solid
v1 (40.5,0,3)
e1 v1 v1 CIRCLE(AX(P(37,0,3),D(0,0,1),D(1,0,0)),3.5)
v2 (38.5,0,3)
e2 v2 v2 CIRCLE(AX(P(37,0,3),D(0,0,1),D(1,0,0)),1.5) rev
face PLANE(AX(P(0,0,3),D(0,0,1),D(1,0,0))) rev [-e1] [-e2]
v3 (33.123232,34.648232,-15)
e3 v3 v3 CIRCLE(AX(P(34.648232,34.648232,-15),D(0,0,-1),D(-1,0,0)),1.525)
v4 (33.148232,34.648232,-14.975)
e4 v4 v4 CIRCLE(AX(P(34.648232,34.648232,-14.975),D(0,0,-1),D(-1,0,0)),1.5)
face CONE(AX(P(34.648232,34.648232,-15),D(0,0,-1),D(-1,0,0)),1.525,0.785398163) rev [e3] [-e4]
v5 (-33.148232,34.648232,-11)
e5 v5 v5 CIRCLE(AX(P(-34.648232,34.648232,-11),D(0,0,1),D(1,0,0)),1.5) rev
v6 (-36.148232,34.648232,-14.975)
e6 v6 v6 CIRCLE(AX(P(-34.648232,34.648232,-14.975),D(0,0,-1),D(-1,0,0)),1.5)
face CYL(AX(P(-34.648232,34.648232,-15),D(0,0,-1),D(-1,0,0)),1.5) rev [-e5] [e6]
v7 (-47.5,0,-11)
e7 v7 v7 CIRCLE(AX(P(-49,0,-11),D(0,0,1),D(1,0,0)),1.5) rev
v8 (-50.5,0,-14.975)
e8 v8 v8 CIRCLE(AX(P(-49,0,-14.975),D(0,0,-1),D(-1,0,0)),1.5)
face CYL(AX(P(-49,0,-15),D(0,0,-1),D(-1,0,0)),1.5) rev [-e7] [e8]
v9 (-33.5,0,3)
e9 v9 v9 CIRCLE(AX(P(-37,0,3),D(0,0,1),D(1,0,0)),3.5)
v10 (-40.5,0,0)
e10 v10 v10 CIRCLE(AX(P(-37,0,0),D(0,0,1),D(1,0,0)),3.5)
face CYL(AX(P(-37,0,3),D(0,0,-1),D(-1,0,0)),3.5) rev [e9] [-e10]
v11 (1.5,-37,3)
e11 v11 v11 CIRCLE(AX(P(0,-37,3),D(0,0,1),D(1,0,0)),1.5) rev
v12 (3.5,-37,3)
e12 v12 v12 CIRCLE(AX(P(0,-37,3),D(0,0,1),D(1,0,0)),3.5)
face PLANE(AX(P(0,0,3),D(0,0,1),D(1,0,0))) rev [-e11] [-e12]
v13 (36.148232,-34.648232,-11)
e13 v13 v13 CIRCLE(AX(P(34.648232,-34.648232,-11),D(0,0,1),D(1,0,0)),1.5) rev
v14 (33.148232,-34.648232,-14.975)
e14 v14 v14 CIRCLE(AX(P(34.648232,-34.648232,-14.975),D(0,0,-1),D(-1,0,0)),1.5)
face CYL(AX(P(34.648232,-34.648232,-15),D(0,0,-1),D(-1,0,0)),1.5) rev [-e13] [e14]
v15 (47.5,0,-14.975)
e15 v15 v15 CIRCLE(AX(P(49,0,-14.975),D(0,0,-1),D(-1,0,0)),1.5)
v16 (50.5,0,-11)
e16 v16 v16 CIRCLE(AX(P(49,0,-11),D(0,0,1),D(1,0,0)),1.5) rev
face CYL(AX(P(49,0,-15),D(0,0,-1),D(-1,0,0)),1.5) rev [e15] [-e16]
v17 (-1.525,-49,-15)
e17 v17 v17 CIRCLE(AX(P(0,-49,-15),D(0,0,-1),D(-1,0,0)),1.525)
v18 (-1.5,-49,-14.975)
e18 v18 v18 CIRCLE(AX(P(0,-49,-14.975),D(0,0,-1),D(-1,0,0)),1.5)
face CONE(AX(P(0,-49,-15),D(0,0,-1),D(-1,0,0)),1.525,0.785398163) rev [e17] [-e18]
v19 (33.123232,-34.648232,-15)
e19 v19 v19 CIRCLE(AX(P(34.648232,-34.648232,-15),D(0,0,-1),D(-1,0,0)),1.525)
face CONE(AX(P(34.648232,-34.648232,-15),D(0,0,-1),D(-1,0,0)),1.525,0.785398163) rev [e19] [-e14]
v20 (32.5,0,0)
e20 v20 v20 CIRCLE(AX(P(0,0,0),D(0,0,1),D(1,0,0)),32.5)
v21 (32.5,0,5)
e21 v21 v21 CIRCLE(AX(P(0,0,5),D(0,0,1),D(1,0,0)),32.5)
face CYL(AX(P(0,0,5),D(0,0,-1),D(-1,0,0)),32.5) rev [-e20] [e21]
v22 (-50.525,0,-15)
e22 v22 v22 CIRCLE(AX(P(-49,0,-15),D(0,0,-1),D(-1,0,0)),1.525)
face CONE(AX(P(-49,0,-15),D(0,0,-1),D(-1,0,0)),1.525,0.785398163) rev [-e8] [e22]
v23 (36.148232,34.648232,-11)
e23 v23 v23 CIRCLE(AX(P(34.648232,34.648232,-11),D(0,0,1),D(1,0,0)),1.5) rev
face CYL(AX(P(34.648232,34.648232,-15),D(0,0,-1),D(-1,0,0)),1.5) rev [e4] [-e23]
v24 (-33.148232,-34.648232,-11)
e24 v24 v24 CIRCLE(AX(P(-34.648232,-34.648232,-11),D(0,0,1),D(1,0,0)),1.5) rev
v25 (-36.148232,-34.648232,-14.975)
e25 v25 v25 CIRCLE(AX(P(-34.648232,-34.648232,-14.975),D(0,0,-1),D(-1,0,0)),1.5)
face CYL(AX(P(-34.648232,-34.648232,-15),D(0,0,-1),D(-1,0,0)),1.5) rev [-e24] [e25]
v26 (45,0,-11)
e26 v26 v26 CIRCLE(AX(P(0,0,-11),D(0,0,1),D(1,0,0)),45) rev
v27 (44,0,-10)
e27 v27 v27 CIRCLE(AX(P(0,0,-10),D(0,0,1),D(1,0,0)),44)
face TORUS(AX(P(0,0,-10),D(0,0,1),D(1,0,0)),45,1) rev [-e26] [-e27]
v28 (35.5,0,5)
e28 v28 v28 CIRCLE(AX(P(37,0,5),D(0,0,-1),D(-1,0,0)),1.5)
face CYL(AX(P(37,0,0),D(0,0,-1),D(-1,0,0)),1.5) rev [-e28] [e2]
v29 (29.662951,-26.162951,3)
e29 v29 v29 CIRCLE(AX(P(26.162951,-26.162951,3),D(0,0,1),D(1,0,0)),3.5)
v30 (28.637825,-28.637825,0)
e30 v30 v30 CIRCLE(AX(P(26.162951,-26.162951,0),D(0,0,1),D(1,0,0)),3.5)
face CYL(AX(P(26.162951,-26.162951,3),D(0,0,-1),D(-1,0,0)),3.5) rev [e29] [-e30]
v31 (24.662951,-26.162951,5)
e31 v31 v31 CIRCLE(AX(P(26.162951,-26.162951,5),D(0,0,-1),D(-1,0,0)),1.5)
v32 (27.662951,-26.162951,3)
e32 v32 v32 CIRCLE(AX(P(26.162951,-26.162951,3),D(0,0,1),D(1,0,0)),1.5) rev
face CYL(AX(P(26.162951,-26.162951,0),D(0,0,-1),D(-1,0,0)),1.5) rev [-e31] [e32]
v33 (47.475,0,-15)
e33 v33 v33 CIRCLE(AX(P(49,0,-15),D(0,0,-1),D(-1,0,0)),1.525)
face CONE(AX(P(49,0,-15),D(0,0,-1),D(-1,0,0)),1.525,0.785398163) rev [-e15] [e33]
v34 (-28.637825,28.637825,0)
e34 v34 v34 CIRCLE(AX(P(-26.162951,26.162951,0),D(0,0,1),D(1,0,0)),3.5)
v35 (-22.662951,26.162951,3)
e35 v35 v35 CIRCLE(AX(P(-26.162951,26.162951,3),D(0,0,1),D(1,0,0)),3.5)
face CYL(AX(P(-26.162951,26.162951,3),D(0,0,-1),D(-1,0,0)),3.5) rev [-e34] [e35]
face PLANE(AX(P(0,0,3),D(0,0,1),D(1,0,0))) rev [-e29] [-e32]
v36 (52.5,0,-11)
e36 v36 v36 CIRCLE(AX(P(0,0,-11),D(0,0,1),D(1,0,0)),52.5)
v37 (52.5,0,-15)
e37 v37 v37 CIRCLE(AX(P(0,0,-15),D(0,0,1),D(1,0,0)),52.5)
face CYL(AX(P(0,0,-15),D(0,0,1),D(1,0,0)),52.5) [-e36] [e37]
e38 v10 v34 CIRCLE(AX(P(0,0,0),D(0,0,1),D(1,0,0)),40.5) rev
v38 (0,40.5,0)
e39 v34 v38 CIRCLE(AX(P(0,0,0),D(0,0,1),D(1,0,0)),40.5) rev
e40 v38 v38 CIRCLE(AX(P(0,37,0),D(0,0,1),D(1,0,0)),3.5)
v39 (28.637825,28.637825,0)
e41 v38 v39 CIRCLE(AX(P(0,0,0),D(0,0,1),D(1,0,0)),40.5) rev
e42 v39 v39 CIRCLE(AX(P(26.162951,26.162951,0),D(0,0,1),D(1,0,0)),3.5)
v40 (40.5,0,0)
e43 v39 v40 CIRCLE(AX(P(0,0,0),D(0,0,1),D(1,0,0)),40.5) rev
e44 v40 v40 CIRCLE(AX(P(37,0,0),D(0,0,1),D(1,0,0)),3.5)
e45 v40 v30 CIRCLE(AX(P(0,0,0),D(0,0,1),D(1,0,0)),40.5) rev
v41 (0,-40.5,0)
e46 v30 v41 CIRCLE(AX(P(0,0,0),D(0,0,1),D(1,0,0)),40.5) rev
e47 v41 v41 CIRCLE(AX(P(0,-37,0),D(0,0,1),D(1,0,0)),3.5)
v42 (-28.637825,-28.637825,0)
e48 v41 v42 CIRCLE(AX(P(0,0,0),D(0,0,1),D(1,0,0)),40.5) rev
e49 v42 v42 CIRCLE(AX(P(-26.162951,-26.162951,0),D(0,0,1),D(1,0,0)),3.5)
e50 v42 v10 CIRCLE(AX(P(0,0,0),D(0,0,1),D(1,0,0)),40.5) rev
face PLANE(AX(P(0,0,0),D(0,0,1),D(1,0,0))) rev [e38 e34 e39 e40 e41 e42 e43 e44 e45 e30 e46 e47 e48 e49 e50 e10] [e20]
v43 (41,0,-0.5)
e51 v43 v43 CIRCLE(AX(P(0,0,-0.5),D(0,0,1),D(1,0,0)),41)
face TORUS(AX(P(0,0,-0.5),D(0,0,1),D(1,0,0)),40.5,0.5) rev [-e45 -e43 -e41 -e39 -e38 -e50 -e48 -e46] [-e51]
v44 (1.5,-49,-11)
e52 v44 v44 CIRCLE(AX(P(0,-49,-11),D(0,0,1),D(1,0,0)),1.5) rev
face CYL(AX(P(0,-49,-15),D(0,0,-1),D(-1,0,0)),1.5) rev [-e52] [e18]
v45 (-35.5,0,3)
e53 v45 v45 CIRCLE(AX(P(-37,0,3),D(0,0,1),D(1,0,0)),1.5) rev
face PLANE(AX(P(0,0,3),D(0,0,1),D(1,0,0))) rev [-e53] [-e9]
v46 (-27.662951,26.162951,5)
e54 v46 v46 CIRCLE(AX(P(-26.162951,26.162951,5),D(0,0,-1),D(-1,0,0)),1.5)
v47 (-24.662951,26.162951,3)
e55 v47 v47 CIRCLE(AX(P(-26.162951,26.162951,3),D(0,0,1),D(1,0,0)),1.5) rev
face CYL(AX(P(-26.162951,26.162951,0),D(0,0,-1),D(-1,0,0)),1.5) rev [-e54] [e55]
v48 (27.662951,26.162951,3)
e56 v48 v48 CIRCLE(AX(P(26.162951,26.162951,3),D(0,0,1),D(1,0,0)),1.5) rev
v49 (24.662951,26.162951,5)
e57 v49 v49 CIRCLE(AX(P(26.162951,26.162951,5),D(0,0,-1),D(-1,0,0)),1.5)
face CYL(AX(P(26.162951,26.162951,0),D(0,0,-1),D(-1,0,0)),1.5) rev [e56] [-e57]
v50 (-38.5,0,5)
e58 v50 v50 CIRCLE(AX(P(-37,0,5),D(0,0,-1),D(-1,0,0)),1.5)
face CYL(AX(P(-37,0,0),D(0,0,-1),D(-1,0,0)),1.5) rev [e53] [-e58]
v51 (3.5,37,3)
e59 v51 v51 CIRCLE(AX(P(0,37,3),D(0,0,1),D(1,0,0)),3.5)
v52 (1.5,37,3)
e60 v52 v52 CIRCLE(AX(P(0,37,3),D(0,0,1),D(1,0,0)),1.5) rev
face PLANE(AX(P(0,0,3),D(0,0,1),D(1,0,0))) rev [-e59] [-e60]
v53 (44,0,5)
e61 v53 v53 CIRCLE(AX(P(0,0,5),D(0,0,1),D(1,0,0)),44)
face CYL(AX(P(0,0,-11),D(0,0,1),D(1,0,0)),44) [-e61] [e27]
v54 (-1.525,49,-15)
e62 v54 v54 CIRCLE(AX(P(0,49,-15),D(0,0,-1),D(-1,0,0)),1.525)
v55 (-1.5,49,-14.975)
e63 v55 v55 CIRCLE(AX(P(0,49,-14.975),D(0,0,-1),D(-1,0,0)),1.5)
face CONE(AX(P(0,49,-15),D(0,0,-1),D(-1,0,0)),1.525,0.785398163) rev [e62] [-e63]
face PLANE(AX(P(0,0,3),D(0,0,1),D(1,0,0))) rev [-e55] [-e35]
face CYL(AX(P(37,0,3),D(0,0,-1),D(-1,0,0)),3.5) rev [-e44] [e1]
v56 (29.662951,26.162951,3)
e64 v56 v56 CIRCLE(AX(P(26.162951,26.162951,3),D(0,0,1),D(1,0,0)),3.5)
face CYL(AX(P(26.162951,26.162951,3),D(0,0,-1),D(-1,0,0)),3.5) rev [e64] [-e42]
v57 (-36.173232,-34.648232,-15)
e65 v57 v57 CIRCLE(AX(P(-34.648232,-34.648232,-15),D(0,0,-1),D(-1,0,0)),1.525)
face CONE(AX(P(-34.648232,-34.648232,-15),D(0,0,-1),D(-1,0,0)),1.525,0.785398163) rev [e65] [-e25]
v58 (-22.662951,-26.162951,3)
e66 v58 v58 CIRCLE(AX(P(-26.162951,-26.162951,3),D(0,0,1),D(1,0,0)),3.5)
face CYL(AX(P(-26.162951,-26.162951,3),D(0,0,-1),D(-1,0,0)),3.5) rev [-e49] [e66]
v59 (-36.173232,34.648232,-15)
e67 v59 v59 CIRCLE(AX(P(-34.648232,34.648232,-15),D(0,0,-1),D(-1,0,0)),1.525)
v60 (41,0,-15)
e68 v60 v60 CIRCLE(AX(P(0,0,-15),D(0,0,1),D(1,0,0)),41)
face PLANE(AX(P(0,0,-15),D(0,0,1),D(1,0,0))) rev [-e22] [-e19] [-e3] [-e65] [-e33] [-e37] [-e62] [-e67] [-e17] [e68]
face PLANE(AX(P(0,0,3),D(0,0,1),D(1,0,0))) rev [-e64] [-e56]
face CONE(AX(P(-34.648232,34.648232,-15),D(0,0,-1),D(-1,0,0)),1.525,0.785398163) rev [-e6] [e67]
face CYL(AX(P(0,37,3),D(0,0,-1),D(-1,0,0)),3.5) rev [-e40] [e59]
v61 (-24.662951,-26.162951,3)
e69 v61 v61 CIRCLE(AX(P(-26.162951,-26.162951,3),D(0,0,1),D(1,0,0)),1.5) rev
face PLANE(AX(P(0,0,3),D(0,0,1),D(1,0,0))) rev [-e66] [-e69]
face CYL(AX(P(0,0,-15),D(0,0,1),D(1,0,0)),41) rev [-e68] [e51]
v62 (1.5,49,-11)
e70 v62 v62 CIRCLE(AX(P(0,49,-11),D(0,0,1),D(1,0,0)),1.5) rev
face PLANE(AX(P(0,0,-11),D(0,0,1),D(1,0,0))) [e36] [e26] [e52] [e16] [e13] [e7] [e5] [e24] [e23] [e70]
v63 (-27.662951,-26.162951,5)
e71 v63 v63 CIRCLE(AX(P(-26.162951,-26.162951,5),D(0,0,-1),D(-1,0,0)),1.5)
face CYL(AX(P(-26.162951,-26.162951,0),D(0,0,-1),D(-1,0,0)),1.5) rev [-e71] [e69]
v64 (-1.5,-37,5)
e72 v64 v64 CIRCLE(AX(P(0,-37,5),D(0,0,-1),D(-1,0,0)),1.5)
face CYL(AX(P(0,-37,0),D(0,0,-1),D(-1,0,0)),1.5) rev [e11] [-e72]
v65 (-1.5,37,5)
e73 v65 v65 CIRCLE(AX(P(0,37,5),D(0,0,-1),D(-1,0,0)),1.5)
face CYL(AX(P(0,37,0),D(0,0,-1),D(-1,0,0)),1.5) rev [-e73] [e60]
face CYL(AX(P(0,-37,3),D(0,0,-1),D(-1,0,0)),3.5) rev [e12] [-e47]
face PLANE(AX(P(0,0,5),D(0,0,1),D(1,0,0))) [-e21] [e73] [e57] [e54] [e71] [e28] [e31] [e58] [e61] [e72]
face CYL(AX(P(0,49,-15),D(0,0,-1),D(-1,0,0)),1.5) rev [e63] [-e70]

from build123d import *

# Parameters (mm, degrees)
SKETCH1_R                       = 41
SKETCH1_R_2                     = 32.5
BOSS_EXTRUDE1_DEPTH             = 5
BOSS_EXTRUDE2_DEPTH             = 5
BOSS_EXTRUDE2_DEPTH_BACK        = 15
SKETCH1_4_R                     = 52.5
SKETCH1_4_R_2                   = 41
F_3_0MM_DOWEL_HOLE1_D           = 3
F_3_0MM_DOWEL_HOLE1_CSINK_D     = 3.05
F_3_0MM_DOWEL_HOLE1_CSINK_ANGLE = 90
SKETCH7_R                       = 3.5
CUT_EXTRUDE1_DEPTH              = 3
F_3_0MM_DOWEL_HOLE2_D           = 3
F_3_0MM_DOWEL_HOLE2_CSINK_D     = 3.05
F_3_0MM_DOWEL_HOLE2_CSINK_ANGLE = 90
SKETCH13_R                      = 52.5
SKETCH13_R_2                    = 1.5
SKETCH13_R_3                    = 44
CUT_EXTRUDE2_DEPTH              = 16
FILLET1_R                       = 0.5
FILLET2_R                       = 1


with BuildPart() as part:
    # Sketch1 → Boss-Extrude1 (new body)
    with BuildSketch(Plane.XY):
        Circle(SKETCH1_R)
        Circle(SKETCH1_R_2, mode=Mode.SUBTRACT)
    extrude(amount=BOSS_EXTRUDE1_DEPTH)

    # Sketch1<4> → Boss-Extrude2 (add, two sides: drawn at the far end of the back side and taken through both)
    with BuildSketch(Plane.XY.offset(-BOSS_EXTRUDE2_DEPTH_BACK)):
        Circle(SKETCH1_4_R)
        Circle(SKETCH1_4_R_2, mode=Mode.SUBTRACT)
    extrude(amount=BOSS_EXTRUDE2_DEPTH + BOSS_EXTRUDE2_DEPTH_BACK)

    # Ø3.0mm Dowel Hole1 (through all)
    with Locations(Plane(origin=(0, 0, 0), x_dir=(-1, 0, 0), z_dir=(0, 0, -1))):
        with Locations((-26.162950904, 26.162950904), (0, 37), (26.162950904, 26.162950904), (37, 0), (-37, 0), (0, -37), (26.162950904, -26.162950904), (-26.162950904, -26.162950904)):
            CounterSinkHole(F_3_0MM_DOWEL_HOLE1_D / 2, F_3_0MM_DOWEL_HOLE1_CSINK_D / 2, counter_sink_angle=F_3_0MM_DOWEL_HOLE1_CSINK_ANGLE)

    # Sketch7 → Cut-Extrude1 (cut)
    with BuildSketch(Plane.XY):
        with Locations((0, 37)):
            Circle(SKETCH7_R)
        with Locations((26.162950904, 26.162950904)):
            Circle(SKETCH7_R)
        with Locations((37, 0)):
            Circle(SKETCH7_R)
        with Locations((26.162950904, -26.162950904)):
            Circle(SKETCH7_R)
        with Locations((0, -37)):
            Circle(SKETCH7_R)
        with Locations((-26.162950904, -26.162950904)):
            Circle(SKETCH7_R)
        with Locations((-37, 0)):
            Circle(SKETCH7_R)
        with Locations((-26.162950904, 26.162950904)):
            Circle(SKETCH7_R)
    extrude(amount=CUT_EXTRUDE1_DEPTH, mode=Mode.SUBTRACT)

    # Ø3.0mm Dowel Hole2 (through all)
    with Locations(Plane(origin=(0, 0, -15), x_dir=(-1, 0, 0), z_dir=(0, 0, -1))):
        with Locations((0, 49), (34.648232278, 34.648232278), (-34.648232278, 34.648232278), (-49, 0), (-34.648232278, -34.648232278), (49, 0), (34.648232278, -34.648232278), (0, -49)):
            CounterSinkHole(F_3_0MM_DOWEL_HOLE2_D / 2, F_3_0MM_DOWEL_HOLE2_CSINK_D / 2, counter_sink_angle=F_3_0MM_DOWEL_HOLE2_CSINK_ANGLE)

    # Sketch13 → Cut-Extrude2 (cut)
    with BuildSketch(Plane.XY.offset(5)):
        Circle(SKETCH13_R)
        with Locations(Location((-34.648232278, -34.648232278, 0), (0, 0, 180.000000005))):
            Circle(SKETCH13_R_2, mode=Mode.SUBTRACT)
        with Locations(Location((0, -49, 0), (0, 0, 180))):
            Circle(SKETCH13_R_2, mode=Mode.SUBTRACT)
        with Locations(Location((34.648232278, -34.648232278, 0), (0, 0, 180.000000005))):
            Circle(SKETCH13_R_2, mode=Mode.SUBTRACT)
        with Locations(Location((-49, 0, 0), (0, 0, 180))):
            Circle(SKETCH13_R_2, mode=Mode.SUBTRACT)
        with Locations(Location((-34.648232278, 34.648232278, 0), (0, 0, 179.999999995))):
            Circle(SKETCH13_R_2, mode=Mode.SUBTRACT)
        Circle(SKETCH13_R_3, mode=Mode.SUBTRACT)
        with Locations(Location((49, 0, 0), (0, 0, 180))):
            Circle(SKETCH13_R_2, mode=Mode.SUBTRACT)
        with Locations(Location((0, 49, 0), (0, 0, 180))):
            Circle(SKETCH13_R_2, mode=Mode.SUBTRACT)
        with Locations(Location((34.648232278, 34.648232278, 0), (0, 0, 179.999999995))):
            Circle(SKETCH13_R_2, mode=Mode.SUBTRACT)
    extrude(amount=-CUT_EXTRUDE2_DEPTH, mode=Mode.SUBTRACT)

    # Fillet1
    fillet1_edges = [part.edges().sort_by_distance(p)[0] for p in [
        (-41, 0, 0),
    ]]
    fillet(fillet1_edges, radius=FILLET1_R - 0.0001)  # a hair under: the kernel refuses the full size

    # Fillet2
    fillet2_edges = [part.edges().sort_by_distance(p)[0] for p in [
        (-44, 0, -11),
    ]]
    fillet(fillet2_edges, radius=FILLET2_R)


solid = part.part
